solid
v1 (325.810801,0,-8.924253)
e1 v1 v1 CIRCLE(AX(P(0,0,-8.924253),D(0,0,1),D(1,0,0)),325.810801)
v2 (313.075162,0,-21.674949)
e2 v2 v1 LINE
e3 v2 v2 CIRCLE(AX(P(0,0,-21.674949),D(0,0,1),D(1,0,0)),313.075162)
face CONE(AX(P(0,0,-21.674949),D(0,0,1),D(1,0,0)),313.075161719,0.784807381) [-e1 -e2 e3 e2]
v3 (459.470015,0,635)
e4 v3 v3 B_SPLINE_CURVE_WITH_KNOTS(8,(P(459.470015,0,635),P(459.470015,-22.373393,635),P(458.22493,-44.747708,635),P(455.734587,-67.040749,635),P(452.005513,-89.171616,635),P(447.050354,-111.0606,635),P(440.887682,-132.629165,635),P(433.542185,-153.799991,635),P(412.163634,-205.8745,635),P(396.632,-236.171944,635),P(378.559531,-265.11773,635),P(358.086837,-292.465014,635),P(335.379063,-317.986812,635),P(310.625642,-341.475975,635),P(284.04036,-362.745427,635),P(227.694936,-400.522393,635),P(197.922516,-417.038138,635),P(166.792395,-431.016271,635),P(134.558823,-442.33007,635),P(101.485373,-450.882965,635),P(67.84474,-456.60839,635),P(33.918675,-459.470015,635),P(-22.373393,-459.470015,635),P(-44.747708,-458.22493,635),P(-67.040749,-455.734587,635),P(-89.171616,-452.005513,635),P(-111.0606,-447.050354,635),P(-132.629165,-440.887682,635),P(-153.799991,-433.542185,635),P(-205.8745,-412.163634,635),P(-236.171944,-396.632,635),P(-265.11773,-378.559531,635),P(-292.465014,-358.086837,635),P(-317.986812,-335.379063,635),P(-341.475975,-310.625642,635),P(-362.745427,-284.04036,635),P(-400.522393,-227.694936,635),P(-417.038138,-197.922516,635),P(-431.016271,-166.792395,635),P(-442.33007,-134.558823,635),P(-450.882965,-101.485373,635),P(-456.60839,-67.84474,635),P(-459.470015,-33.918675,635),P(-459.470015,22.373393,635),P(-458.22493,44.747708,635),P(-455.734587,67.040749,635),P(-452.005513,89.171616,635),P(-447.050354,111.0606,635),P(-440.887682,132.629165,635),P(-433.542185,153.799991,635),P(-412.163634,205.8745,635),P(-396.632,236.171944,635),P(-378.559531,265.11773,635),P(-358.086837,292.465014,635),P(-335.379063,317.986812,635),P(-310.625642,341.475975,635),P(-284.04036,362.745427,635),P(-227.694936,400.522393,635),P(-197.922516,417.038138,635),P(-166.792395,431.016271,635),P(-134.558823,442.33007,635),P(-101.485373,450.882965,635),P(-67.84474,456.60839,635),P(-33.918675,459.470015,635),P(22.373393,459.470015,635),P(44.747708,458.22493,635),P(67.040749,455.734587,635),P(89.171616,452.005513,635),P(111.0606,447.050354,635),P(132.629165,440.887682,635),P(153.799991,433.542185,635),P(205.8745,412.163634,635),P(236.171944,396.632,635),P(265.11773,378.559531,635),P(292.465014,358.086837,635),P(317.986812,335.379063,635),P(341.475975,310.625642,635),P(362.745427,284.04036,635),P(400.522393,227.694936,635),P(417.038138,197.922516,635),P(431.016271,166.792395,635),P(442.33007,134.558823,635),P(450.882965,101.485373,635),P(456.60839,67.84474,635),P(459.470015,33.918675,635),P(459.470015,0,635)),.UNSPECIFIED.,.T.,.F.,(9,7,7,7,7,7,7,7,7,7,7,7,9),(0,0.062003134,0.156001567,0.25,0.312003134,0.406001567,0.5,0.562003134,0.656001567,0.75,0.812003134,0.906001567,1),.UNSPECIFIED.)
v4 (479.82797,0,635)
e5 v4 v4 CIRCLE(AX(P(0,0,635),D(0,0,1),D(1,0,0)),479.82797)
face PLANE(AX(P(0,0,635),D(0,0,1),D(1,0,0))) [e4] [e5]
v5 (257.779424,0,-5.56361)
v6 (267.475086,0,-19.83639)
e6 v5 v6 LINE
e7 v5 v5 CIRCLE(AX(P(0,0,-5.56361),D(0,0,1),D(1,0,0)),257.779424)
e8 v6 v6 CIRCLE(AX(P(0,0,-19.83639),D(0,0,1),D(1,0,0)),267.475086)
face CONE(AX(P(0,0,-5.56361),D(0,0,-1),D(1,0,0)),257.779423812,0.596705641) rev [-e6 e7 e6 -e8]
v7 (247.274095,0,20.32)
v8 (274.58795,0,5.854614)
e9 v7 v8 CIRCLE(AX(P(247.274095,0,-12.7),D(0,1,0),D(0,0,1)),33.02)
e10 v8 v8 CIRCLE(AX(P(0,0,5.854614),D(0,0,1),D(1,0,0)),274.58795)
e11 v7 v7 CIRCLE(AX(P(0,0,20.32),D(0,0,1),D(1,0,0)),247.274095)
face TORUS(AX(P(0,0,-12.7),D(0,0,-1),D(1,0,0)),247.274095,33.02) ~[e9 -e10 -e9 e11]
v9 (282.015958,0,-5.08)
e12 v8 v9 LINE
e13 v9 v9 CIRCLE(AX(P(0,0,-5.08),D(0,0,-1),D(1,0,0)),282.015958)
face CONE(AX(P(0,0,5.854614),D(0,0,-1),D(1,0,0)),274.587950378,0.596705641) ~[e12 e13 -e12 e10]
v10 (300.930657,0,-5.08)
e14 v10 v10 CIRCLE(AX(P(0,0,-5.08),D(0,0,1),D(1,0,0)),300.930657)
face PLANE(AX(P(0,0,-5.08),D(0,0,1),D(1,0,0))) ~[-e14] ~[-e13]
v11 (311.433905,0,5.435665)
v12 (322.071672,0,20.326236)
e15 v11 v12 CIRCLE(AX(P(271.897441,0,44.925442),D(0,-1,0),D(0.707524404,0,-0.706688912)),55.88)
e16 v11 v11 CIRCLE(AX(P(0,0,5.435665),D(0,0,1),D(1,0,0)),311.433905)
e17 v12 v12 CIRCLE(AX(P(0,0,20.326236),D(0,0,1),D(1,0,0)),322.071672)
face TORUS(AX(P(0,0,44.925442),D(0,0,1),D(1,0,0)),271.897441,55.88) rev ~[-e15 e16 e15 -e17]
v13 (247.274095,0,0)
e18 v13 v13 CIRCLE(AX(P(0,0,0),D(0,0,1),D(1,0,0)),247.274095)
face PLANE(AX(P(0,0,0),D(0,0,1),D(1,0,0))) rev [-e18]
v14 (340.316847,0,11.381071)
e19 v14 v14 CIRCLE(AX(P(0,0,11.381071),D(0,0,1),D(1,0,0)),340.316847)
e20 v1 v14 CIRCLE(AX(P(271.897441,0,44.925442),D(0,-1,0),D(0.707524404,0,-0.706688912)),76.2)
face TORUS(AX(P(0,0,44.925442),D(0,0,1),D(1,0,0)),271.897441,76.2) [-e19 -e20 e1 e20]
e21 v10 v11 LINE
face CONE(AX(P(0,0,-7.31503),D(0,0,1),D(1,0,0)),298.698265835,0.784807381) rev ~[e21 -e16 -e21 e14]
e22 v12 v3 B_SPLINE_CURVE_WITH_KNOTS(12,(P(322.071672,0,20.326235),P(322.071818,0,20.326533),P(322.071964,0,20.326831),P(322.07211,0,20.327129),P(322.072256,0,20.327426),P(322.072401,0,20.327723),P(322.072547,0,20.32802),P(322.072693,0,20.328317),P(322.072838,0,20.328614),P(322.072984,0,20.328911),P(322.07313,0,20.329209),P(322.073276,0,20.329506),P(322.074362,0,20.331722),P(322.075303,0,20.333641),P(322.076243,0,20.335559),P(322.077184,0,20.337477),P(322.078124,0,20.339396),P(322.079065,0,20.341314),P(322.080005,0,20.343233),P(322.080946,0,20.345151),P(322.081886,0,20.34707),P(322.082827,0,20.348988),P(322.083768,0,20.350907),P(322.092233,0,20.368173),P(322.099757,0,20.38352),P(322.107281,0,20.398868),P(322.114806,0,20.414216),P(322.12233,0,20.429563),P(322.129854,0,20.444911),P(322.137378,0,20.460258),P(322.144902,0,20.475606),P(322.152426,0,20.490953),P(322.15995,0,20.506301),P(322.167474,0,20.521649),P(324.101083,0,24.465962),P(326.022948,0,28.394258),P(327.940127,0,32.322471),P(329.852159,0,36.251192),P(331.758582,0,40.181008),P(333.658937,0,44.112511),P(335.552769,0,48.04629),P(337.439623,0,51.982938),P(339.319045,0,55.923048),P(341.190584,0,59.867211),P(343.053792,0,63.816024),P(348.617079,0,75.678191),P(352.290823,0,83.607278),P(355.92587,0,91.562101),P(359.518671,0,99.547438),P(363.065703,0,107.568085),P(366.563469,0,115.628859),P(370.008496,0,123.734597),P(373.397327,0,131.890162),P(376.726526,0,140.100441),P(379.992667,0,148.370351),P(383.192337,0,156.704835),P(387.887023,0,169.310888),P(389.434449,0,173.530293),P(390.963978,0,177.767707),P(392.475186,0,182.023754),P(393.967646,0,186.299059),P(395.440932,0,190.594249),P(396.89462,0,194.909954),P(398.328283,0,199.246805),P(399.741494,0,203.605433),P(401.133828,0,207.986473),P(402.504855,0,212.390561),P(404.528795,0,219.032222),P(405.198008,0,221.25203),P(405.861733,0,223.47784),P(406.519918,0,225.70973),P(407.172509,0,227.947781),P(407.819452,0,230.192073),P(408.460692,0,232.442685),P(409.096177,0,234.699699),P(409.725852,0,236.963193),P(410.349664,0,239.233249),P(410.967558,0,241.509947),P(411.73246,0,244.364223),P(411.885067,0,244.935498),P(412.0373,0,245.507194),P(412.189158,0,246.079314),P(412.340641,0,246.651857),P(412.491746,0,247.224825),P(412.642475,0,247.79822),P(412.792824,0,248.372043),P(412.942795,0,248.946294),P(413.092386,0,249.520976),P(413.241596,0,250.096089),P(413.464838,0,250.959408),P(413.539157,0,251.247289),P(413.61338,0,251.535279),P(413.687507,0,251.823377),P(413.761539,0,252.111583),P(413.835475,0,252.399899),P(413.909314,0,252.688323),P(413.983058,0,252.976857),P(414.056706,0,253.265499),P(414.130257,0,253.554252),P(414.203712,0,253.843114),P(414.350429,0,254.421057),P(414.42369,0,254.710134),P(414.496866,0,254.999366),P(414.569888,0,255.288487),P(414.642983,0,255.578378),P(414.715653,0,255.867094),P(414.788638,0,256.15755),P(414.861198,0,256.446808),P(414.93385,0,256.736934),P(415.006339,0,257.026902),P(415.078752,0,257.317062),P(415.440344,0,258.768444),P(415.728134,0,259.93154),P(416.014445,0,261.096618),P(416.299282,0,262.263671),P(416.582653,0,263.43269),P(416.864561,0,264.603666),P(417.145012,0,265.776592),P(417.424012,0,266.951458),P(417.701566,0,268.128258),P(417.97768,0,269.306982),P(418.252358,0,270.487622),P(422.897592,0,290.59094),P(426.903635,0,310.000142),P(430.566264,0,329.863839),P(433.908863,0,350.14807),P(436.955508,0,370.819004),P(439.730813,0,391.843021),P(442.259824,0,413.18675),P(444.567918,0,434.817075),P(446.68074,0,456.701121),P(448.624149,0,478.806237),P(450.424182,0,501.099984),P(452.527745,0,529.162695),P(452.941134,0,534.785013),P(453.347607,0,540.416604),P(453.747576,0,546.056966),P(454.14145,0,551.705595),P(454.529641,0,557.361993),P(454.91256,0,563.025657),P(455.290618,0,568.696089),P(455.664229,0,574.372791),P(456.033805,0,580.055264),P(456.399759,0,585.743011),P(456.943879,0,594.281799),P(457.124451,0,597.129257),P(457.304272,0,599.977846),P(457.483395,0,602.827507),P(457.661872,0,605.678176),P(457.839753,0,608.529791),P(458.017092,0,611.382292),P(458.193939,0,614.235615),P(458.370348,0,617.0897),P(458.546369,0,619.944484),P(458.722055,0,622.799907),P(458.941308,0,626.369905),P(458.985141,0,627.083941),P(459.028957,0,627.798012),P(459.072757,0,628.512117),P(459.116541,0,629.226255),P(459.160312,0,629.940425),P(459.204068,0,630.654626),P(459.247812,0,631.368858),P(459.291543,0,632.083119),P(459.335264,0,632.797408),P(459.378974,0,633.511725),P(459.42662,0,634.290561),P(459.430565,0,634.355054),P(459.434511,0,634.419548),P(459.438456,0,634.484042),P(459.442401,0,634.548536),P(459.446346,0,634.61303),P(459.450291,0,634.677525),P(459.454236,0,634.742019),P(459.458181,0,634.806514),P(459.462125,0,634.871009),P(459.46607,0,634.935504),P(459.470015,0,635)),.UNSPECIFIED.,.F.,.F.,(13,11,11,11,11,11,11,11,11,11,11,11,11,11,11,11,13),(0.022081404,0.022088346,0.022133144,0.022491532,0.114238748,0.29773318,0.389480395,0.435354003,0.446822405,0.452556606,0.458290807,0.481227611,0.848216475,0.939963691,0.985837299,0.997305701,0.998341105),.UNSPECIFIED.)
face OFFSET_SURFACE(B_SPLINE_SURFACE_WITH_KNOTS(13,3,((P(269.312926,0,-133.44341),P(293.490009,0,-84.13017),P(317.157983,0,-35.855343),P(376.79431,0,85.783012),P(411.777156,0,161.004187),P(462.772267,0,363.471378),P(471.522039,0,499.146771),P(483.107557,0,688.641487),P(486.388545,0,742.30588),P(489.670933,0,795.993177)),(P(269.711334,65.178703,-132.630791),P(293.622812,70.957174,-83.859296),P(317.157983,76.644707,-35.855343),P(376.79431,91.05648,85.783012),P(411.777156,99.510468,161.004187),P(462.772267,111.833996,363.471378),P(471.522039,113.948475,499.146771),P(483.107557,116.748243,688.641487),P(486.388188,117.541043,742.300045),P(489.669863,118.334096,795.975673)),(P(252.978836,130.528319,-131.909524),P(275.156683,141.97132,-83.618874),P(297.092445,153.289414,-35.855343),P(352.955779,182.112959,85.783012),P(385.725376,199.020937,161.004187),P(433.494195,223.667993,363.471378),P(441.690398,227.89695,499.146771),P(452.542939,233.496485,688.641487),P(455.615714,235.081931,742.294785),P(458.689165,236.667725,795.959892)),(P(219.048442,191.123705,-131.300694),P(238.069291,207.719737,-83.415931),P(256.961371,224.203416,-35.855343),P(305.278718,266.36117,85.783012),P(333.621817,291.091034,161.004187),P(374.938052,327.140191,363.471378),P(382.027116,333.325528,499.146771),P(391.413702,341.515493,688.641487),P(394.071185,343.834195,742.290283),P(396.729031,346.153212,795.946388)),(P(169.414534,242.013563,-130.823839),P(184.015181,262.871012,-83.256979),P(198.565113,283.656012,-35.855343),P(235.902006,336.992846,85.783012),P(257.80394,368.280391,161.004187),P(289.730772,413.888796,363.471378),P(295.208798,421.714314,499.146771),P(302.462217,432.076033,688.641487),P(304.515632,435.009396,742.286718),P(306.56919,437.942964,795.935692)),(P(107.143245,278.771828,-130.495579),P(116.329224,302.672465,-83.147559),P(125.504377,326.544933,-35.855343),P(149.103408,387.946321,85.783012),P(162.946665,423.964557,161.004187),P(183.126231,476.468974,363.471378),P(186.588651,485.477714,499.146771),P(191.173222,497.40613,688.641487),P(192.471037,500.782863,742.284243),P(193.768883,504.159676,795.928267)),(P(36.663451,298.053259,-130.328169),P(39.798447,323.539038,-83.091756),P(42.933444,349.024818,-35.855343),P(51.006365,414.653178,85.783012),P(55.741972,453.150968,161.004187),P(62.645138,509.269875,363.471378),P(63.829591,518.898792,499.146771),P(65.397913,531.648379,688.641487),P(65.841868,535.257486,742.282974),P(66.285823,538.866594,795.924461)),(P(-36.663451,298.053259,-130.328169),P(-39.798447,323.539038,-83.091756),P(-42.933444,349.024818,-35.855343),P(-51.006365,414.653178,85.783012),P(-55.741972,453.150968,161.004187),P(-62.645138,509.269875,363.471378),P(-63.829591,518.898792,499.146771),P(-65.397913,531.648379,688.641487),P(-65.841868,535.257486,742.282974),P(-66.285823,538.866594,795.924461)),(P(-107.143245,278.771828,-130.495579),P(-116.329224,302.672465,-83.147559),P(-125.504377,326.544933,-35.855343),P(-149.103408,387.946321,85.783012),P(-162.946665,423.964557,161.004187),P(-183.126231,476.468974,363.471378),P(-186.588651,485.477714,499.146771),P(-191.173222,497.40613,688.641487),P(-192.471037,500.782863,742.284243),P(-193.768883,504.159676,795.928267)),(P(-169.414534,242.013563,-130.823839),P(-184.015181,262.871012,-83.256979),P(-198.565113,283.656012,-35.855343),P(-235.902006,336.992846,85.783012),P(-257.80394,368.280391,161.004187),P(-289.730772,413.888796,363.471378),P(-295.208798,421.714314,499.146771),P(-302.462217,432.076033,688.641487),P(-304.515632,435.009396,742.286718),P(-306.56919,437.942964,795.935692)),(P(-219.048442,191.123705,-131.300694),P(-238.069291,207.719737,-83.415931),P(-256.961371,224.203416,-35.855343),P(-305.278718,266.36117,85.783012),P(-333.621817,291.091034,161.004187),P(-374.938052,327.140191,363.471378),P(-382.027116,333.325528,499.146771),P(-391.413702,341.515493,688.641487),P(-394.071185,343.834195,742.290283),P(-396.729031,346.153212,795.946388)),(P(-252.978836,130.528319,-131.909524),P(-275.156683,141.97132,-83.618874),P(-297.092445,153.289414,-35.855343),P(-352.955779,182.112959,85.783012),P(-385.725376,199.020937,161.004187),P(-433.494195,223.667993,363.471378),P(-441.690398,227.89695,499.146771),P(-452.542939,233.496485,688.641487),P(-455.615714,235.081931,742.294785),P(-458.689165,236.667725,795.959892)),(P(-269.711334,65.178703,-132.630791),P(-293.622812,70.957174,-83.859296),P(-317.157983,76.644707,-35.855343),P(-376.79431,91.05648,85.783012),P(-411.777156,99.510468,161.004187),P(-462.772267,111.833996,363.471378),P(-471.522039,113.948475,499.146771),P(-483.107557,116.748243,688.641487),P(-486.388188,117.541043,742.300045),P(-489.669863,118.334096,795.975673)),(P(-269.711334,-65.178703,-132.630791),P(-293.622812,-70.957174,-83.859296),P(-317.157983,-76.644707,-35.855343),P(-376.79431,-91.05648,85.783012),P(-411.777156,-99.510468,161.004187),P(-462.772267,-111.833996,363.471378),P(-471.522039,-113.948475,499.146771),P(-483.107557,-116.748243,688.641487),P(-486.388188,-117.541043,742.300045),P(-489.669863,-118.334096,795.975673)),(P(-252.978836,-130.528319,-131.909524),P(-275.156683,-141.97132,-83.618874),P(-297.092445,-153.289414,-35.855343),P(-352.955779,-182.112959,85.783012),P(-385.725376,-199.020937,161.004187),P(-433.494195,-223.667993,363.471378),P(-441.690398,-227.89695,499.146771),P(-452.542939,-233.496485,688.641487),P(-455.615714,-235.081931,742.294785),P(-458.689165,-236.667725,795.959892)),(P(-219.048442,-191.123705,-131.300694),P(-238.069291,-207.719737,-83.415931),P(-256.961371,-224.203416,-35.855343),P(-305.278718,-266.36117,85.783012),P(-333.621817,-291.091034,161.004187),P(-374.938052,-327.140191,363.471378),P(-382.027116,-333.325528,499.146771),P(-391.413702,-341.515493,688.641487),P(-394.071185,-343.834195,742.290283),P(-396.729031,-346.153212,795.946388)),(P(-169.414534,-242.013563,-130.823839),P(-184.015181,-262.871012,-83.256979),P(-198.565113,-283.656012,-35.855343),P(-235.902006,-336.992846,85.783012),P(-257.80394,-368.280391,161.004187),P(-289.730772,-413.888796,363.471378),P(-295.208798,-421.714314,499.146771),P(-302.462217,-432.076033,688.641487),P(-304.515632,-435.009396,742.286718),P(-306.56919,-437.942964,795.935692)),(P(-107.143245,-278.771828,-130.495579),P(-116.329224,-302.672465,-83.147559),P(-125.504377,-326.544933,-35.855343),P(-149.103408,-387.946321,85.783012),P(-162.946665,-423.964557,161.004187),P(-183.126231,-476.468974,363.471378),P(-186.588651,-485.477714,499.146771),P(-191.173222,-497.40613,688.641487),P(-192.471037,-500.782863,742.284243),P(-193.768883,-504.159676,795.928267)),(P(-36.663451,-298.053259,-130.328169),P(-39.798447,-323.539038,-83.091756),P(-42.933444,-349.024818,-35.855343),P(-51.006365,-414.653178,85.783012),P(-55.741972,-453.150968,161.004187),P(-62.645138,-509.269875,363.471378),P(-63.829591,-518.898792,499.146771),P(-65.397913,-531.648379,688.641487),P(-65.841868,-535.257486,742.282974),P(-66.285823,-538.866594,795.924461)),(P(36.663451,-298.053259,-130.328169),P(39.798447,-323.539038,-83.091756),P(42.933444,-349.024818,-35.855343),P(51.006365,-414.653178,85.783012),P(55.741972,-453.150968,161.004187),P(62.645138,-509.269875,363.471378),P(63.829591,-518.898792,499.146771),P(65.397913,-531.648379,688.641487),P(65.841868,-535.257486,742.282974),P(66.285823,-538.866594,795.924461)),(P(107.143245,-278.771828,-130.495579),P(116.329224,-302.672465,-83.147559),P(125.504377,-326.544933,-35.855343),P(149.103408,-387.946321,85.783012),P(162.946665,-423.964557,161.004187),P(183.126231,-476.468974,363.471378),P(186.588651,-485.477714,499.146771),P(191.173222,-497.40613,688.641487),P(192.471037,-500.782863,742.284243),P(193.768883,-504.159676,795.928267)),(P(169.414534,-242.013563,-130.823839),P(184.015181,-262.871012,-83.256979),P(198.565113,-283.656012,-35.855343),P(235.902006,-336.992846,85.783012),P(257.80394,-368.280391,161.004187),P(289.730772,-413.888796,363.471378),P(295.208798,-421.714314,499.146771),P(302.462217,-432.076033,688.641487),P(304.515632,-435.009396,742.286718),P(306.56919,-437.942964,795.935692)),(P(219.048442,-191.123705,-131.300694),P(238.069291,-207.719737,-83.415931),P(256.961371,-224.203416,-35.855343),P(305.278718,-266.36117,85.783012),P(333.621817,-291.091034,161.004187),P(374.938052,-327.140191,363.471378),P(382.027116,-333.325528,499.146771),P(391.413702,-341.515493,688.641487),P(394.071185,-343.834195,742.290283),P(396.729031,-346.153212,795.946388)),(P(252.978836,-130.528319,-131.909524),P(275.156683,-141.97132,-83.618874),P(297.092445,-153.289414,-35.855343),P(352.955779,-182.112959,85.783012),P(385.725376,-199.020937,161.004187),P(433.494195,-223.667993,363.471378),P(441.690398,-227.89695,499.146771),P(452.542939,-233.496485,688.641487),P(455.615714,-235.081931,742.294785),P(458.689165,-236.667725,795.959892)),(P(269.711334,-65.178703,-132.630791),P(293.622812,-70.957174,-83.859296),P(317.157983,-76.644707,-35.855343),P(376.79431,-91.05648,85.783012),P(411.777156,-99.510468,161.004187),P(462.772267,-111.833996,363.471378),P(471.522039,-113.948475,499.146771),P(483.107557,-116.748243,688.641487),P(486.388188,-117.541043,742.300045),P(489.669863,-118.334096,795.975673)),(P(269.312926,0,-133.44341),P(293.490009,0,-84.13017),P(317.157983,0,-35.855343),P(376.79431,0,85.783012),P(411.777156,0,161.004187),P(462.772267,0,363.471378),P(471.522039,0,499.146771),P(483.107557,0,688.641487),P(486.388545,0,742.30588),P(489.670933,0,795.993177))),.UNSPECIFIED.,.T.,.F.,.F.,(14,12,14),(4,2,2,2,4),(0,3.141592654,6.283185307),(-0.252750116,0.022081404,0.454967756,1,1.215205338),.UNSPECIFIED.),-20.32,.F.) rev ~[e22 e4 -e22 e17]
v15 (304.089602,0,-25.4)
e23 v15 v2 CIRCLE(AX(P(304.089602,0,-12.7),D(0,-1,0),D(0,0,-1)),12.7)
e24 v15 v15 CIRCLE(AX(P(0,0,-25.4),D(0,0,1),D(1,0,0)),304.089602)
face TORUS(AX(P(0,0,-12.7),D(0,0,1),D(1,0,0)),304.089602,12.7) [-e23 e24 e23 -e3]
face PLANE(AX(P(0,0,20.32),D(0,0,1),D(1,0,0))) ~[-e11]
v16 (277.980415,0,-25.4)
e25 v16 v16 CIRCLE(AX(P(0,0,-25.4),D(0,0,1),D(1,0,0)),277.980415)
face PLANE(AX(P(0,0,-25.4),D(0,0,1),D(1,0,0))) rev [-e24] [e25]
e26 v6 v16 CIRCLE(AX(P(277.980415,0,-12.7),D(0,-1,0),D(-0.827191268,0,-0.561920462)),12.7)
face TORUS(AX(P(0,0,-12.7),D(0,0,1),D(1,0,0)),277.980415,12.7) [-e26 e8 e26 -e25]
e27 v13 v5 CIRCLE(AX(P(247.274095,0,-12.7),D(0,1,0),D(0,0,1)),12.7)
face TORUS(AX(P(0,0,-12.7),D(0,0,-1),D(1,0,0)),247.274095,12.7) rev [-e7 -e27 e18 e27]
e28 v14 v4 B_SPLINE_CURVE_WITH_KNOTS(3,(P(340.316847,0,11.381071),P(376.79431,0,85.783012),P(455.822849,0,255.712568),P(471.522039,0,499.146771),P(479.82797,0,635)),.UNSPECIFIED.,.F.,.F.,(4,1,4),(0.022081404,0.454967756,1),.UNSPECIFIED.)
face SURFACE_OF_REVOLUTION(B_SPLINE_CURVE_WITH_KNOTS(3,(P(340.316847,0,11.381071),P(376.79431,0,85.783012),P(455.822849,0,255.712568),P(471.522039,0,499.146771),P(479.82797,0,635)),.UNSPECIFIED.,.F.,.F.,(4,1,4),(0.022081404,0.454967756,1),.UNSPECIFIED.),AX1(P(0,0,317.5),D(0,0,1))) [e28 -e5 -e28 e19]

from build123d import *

# Parameters (mm, degrees)
F2_T = -20.32


with BuildPart() as f1:
    # F0 (on Front) → F1 (revolve)
    with BuildSketch(Plane.XZ):
        with BuildLine():
            Line((0, 635), (0, 0))
            Line((0, 0), (247.2740947085, 0))
            ThreePointArc((247.2740947085, 0), (253.2179086611, -1.4767617999), (257.779423812, -5.5636101265))
            Line((257.779423812, -5.5636101265), (267.4750858754, -19.8363898735))
            ThreePointArc((267.4750858754, -19.8363898735), (272.0366010263, -23.9232382001), (277.980414979, -25.4))
            Line((277.980414979, -25.4), (304.0896017916, -25.4))
            ThreePointArc((304.0896017916, -25.4), (308.9531470731, -24.4318339272), (313.0751617192, -21.6749491802))
            Line((313.0751617192, -21.6749491802), (325.8108005635, -8.9242534656))
            ThreePointArc((325.8108005635, -8.9242534656), (333.9006905197, 0.6305542274), (340.3168473718, 11.3810705313))
            add(Edge.make_bspline(
                [(340.3168473718, 11.3810705313), (376.7943098118, 85.7830117652), (455.8228488247, 255.712567795), (471.5220391728, 499.1467710715), (479.8279702663, 635)],
                knots=[0.0220814037, 0.0220814037, 0.0220814037, 0.0220814037, 0.4549677561, 1, 1, 1, 1], degree=3))
            Line((479.8279702663, 635), (0, 635))
        make_face()
    revolve(axis=Axis((0, 0, 317.5), (0, 0, 1)))

    # F2
    f2_openings = [f1.faces().sort_by_distance(p)[0] for p in [
        (0, 0, 635),
    ]]
    offset(amount=F2_T, openings=f2_openings)


solid = f1.part
